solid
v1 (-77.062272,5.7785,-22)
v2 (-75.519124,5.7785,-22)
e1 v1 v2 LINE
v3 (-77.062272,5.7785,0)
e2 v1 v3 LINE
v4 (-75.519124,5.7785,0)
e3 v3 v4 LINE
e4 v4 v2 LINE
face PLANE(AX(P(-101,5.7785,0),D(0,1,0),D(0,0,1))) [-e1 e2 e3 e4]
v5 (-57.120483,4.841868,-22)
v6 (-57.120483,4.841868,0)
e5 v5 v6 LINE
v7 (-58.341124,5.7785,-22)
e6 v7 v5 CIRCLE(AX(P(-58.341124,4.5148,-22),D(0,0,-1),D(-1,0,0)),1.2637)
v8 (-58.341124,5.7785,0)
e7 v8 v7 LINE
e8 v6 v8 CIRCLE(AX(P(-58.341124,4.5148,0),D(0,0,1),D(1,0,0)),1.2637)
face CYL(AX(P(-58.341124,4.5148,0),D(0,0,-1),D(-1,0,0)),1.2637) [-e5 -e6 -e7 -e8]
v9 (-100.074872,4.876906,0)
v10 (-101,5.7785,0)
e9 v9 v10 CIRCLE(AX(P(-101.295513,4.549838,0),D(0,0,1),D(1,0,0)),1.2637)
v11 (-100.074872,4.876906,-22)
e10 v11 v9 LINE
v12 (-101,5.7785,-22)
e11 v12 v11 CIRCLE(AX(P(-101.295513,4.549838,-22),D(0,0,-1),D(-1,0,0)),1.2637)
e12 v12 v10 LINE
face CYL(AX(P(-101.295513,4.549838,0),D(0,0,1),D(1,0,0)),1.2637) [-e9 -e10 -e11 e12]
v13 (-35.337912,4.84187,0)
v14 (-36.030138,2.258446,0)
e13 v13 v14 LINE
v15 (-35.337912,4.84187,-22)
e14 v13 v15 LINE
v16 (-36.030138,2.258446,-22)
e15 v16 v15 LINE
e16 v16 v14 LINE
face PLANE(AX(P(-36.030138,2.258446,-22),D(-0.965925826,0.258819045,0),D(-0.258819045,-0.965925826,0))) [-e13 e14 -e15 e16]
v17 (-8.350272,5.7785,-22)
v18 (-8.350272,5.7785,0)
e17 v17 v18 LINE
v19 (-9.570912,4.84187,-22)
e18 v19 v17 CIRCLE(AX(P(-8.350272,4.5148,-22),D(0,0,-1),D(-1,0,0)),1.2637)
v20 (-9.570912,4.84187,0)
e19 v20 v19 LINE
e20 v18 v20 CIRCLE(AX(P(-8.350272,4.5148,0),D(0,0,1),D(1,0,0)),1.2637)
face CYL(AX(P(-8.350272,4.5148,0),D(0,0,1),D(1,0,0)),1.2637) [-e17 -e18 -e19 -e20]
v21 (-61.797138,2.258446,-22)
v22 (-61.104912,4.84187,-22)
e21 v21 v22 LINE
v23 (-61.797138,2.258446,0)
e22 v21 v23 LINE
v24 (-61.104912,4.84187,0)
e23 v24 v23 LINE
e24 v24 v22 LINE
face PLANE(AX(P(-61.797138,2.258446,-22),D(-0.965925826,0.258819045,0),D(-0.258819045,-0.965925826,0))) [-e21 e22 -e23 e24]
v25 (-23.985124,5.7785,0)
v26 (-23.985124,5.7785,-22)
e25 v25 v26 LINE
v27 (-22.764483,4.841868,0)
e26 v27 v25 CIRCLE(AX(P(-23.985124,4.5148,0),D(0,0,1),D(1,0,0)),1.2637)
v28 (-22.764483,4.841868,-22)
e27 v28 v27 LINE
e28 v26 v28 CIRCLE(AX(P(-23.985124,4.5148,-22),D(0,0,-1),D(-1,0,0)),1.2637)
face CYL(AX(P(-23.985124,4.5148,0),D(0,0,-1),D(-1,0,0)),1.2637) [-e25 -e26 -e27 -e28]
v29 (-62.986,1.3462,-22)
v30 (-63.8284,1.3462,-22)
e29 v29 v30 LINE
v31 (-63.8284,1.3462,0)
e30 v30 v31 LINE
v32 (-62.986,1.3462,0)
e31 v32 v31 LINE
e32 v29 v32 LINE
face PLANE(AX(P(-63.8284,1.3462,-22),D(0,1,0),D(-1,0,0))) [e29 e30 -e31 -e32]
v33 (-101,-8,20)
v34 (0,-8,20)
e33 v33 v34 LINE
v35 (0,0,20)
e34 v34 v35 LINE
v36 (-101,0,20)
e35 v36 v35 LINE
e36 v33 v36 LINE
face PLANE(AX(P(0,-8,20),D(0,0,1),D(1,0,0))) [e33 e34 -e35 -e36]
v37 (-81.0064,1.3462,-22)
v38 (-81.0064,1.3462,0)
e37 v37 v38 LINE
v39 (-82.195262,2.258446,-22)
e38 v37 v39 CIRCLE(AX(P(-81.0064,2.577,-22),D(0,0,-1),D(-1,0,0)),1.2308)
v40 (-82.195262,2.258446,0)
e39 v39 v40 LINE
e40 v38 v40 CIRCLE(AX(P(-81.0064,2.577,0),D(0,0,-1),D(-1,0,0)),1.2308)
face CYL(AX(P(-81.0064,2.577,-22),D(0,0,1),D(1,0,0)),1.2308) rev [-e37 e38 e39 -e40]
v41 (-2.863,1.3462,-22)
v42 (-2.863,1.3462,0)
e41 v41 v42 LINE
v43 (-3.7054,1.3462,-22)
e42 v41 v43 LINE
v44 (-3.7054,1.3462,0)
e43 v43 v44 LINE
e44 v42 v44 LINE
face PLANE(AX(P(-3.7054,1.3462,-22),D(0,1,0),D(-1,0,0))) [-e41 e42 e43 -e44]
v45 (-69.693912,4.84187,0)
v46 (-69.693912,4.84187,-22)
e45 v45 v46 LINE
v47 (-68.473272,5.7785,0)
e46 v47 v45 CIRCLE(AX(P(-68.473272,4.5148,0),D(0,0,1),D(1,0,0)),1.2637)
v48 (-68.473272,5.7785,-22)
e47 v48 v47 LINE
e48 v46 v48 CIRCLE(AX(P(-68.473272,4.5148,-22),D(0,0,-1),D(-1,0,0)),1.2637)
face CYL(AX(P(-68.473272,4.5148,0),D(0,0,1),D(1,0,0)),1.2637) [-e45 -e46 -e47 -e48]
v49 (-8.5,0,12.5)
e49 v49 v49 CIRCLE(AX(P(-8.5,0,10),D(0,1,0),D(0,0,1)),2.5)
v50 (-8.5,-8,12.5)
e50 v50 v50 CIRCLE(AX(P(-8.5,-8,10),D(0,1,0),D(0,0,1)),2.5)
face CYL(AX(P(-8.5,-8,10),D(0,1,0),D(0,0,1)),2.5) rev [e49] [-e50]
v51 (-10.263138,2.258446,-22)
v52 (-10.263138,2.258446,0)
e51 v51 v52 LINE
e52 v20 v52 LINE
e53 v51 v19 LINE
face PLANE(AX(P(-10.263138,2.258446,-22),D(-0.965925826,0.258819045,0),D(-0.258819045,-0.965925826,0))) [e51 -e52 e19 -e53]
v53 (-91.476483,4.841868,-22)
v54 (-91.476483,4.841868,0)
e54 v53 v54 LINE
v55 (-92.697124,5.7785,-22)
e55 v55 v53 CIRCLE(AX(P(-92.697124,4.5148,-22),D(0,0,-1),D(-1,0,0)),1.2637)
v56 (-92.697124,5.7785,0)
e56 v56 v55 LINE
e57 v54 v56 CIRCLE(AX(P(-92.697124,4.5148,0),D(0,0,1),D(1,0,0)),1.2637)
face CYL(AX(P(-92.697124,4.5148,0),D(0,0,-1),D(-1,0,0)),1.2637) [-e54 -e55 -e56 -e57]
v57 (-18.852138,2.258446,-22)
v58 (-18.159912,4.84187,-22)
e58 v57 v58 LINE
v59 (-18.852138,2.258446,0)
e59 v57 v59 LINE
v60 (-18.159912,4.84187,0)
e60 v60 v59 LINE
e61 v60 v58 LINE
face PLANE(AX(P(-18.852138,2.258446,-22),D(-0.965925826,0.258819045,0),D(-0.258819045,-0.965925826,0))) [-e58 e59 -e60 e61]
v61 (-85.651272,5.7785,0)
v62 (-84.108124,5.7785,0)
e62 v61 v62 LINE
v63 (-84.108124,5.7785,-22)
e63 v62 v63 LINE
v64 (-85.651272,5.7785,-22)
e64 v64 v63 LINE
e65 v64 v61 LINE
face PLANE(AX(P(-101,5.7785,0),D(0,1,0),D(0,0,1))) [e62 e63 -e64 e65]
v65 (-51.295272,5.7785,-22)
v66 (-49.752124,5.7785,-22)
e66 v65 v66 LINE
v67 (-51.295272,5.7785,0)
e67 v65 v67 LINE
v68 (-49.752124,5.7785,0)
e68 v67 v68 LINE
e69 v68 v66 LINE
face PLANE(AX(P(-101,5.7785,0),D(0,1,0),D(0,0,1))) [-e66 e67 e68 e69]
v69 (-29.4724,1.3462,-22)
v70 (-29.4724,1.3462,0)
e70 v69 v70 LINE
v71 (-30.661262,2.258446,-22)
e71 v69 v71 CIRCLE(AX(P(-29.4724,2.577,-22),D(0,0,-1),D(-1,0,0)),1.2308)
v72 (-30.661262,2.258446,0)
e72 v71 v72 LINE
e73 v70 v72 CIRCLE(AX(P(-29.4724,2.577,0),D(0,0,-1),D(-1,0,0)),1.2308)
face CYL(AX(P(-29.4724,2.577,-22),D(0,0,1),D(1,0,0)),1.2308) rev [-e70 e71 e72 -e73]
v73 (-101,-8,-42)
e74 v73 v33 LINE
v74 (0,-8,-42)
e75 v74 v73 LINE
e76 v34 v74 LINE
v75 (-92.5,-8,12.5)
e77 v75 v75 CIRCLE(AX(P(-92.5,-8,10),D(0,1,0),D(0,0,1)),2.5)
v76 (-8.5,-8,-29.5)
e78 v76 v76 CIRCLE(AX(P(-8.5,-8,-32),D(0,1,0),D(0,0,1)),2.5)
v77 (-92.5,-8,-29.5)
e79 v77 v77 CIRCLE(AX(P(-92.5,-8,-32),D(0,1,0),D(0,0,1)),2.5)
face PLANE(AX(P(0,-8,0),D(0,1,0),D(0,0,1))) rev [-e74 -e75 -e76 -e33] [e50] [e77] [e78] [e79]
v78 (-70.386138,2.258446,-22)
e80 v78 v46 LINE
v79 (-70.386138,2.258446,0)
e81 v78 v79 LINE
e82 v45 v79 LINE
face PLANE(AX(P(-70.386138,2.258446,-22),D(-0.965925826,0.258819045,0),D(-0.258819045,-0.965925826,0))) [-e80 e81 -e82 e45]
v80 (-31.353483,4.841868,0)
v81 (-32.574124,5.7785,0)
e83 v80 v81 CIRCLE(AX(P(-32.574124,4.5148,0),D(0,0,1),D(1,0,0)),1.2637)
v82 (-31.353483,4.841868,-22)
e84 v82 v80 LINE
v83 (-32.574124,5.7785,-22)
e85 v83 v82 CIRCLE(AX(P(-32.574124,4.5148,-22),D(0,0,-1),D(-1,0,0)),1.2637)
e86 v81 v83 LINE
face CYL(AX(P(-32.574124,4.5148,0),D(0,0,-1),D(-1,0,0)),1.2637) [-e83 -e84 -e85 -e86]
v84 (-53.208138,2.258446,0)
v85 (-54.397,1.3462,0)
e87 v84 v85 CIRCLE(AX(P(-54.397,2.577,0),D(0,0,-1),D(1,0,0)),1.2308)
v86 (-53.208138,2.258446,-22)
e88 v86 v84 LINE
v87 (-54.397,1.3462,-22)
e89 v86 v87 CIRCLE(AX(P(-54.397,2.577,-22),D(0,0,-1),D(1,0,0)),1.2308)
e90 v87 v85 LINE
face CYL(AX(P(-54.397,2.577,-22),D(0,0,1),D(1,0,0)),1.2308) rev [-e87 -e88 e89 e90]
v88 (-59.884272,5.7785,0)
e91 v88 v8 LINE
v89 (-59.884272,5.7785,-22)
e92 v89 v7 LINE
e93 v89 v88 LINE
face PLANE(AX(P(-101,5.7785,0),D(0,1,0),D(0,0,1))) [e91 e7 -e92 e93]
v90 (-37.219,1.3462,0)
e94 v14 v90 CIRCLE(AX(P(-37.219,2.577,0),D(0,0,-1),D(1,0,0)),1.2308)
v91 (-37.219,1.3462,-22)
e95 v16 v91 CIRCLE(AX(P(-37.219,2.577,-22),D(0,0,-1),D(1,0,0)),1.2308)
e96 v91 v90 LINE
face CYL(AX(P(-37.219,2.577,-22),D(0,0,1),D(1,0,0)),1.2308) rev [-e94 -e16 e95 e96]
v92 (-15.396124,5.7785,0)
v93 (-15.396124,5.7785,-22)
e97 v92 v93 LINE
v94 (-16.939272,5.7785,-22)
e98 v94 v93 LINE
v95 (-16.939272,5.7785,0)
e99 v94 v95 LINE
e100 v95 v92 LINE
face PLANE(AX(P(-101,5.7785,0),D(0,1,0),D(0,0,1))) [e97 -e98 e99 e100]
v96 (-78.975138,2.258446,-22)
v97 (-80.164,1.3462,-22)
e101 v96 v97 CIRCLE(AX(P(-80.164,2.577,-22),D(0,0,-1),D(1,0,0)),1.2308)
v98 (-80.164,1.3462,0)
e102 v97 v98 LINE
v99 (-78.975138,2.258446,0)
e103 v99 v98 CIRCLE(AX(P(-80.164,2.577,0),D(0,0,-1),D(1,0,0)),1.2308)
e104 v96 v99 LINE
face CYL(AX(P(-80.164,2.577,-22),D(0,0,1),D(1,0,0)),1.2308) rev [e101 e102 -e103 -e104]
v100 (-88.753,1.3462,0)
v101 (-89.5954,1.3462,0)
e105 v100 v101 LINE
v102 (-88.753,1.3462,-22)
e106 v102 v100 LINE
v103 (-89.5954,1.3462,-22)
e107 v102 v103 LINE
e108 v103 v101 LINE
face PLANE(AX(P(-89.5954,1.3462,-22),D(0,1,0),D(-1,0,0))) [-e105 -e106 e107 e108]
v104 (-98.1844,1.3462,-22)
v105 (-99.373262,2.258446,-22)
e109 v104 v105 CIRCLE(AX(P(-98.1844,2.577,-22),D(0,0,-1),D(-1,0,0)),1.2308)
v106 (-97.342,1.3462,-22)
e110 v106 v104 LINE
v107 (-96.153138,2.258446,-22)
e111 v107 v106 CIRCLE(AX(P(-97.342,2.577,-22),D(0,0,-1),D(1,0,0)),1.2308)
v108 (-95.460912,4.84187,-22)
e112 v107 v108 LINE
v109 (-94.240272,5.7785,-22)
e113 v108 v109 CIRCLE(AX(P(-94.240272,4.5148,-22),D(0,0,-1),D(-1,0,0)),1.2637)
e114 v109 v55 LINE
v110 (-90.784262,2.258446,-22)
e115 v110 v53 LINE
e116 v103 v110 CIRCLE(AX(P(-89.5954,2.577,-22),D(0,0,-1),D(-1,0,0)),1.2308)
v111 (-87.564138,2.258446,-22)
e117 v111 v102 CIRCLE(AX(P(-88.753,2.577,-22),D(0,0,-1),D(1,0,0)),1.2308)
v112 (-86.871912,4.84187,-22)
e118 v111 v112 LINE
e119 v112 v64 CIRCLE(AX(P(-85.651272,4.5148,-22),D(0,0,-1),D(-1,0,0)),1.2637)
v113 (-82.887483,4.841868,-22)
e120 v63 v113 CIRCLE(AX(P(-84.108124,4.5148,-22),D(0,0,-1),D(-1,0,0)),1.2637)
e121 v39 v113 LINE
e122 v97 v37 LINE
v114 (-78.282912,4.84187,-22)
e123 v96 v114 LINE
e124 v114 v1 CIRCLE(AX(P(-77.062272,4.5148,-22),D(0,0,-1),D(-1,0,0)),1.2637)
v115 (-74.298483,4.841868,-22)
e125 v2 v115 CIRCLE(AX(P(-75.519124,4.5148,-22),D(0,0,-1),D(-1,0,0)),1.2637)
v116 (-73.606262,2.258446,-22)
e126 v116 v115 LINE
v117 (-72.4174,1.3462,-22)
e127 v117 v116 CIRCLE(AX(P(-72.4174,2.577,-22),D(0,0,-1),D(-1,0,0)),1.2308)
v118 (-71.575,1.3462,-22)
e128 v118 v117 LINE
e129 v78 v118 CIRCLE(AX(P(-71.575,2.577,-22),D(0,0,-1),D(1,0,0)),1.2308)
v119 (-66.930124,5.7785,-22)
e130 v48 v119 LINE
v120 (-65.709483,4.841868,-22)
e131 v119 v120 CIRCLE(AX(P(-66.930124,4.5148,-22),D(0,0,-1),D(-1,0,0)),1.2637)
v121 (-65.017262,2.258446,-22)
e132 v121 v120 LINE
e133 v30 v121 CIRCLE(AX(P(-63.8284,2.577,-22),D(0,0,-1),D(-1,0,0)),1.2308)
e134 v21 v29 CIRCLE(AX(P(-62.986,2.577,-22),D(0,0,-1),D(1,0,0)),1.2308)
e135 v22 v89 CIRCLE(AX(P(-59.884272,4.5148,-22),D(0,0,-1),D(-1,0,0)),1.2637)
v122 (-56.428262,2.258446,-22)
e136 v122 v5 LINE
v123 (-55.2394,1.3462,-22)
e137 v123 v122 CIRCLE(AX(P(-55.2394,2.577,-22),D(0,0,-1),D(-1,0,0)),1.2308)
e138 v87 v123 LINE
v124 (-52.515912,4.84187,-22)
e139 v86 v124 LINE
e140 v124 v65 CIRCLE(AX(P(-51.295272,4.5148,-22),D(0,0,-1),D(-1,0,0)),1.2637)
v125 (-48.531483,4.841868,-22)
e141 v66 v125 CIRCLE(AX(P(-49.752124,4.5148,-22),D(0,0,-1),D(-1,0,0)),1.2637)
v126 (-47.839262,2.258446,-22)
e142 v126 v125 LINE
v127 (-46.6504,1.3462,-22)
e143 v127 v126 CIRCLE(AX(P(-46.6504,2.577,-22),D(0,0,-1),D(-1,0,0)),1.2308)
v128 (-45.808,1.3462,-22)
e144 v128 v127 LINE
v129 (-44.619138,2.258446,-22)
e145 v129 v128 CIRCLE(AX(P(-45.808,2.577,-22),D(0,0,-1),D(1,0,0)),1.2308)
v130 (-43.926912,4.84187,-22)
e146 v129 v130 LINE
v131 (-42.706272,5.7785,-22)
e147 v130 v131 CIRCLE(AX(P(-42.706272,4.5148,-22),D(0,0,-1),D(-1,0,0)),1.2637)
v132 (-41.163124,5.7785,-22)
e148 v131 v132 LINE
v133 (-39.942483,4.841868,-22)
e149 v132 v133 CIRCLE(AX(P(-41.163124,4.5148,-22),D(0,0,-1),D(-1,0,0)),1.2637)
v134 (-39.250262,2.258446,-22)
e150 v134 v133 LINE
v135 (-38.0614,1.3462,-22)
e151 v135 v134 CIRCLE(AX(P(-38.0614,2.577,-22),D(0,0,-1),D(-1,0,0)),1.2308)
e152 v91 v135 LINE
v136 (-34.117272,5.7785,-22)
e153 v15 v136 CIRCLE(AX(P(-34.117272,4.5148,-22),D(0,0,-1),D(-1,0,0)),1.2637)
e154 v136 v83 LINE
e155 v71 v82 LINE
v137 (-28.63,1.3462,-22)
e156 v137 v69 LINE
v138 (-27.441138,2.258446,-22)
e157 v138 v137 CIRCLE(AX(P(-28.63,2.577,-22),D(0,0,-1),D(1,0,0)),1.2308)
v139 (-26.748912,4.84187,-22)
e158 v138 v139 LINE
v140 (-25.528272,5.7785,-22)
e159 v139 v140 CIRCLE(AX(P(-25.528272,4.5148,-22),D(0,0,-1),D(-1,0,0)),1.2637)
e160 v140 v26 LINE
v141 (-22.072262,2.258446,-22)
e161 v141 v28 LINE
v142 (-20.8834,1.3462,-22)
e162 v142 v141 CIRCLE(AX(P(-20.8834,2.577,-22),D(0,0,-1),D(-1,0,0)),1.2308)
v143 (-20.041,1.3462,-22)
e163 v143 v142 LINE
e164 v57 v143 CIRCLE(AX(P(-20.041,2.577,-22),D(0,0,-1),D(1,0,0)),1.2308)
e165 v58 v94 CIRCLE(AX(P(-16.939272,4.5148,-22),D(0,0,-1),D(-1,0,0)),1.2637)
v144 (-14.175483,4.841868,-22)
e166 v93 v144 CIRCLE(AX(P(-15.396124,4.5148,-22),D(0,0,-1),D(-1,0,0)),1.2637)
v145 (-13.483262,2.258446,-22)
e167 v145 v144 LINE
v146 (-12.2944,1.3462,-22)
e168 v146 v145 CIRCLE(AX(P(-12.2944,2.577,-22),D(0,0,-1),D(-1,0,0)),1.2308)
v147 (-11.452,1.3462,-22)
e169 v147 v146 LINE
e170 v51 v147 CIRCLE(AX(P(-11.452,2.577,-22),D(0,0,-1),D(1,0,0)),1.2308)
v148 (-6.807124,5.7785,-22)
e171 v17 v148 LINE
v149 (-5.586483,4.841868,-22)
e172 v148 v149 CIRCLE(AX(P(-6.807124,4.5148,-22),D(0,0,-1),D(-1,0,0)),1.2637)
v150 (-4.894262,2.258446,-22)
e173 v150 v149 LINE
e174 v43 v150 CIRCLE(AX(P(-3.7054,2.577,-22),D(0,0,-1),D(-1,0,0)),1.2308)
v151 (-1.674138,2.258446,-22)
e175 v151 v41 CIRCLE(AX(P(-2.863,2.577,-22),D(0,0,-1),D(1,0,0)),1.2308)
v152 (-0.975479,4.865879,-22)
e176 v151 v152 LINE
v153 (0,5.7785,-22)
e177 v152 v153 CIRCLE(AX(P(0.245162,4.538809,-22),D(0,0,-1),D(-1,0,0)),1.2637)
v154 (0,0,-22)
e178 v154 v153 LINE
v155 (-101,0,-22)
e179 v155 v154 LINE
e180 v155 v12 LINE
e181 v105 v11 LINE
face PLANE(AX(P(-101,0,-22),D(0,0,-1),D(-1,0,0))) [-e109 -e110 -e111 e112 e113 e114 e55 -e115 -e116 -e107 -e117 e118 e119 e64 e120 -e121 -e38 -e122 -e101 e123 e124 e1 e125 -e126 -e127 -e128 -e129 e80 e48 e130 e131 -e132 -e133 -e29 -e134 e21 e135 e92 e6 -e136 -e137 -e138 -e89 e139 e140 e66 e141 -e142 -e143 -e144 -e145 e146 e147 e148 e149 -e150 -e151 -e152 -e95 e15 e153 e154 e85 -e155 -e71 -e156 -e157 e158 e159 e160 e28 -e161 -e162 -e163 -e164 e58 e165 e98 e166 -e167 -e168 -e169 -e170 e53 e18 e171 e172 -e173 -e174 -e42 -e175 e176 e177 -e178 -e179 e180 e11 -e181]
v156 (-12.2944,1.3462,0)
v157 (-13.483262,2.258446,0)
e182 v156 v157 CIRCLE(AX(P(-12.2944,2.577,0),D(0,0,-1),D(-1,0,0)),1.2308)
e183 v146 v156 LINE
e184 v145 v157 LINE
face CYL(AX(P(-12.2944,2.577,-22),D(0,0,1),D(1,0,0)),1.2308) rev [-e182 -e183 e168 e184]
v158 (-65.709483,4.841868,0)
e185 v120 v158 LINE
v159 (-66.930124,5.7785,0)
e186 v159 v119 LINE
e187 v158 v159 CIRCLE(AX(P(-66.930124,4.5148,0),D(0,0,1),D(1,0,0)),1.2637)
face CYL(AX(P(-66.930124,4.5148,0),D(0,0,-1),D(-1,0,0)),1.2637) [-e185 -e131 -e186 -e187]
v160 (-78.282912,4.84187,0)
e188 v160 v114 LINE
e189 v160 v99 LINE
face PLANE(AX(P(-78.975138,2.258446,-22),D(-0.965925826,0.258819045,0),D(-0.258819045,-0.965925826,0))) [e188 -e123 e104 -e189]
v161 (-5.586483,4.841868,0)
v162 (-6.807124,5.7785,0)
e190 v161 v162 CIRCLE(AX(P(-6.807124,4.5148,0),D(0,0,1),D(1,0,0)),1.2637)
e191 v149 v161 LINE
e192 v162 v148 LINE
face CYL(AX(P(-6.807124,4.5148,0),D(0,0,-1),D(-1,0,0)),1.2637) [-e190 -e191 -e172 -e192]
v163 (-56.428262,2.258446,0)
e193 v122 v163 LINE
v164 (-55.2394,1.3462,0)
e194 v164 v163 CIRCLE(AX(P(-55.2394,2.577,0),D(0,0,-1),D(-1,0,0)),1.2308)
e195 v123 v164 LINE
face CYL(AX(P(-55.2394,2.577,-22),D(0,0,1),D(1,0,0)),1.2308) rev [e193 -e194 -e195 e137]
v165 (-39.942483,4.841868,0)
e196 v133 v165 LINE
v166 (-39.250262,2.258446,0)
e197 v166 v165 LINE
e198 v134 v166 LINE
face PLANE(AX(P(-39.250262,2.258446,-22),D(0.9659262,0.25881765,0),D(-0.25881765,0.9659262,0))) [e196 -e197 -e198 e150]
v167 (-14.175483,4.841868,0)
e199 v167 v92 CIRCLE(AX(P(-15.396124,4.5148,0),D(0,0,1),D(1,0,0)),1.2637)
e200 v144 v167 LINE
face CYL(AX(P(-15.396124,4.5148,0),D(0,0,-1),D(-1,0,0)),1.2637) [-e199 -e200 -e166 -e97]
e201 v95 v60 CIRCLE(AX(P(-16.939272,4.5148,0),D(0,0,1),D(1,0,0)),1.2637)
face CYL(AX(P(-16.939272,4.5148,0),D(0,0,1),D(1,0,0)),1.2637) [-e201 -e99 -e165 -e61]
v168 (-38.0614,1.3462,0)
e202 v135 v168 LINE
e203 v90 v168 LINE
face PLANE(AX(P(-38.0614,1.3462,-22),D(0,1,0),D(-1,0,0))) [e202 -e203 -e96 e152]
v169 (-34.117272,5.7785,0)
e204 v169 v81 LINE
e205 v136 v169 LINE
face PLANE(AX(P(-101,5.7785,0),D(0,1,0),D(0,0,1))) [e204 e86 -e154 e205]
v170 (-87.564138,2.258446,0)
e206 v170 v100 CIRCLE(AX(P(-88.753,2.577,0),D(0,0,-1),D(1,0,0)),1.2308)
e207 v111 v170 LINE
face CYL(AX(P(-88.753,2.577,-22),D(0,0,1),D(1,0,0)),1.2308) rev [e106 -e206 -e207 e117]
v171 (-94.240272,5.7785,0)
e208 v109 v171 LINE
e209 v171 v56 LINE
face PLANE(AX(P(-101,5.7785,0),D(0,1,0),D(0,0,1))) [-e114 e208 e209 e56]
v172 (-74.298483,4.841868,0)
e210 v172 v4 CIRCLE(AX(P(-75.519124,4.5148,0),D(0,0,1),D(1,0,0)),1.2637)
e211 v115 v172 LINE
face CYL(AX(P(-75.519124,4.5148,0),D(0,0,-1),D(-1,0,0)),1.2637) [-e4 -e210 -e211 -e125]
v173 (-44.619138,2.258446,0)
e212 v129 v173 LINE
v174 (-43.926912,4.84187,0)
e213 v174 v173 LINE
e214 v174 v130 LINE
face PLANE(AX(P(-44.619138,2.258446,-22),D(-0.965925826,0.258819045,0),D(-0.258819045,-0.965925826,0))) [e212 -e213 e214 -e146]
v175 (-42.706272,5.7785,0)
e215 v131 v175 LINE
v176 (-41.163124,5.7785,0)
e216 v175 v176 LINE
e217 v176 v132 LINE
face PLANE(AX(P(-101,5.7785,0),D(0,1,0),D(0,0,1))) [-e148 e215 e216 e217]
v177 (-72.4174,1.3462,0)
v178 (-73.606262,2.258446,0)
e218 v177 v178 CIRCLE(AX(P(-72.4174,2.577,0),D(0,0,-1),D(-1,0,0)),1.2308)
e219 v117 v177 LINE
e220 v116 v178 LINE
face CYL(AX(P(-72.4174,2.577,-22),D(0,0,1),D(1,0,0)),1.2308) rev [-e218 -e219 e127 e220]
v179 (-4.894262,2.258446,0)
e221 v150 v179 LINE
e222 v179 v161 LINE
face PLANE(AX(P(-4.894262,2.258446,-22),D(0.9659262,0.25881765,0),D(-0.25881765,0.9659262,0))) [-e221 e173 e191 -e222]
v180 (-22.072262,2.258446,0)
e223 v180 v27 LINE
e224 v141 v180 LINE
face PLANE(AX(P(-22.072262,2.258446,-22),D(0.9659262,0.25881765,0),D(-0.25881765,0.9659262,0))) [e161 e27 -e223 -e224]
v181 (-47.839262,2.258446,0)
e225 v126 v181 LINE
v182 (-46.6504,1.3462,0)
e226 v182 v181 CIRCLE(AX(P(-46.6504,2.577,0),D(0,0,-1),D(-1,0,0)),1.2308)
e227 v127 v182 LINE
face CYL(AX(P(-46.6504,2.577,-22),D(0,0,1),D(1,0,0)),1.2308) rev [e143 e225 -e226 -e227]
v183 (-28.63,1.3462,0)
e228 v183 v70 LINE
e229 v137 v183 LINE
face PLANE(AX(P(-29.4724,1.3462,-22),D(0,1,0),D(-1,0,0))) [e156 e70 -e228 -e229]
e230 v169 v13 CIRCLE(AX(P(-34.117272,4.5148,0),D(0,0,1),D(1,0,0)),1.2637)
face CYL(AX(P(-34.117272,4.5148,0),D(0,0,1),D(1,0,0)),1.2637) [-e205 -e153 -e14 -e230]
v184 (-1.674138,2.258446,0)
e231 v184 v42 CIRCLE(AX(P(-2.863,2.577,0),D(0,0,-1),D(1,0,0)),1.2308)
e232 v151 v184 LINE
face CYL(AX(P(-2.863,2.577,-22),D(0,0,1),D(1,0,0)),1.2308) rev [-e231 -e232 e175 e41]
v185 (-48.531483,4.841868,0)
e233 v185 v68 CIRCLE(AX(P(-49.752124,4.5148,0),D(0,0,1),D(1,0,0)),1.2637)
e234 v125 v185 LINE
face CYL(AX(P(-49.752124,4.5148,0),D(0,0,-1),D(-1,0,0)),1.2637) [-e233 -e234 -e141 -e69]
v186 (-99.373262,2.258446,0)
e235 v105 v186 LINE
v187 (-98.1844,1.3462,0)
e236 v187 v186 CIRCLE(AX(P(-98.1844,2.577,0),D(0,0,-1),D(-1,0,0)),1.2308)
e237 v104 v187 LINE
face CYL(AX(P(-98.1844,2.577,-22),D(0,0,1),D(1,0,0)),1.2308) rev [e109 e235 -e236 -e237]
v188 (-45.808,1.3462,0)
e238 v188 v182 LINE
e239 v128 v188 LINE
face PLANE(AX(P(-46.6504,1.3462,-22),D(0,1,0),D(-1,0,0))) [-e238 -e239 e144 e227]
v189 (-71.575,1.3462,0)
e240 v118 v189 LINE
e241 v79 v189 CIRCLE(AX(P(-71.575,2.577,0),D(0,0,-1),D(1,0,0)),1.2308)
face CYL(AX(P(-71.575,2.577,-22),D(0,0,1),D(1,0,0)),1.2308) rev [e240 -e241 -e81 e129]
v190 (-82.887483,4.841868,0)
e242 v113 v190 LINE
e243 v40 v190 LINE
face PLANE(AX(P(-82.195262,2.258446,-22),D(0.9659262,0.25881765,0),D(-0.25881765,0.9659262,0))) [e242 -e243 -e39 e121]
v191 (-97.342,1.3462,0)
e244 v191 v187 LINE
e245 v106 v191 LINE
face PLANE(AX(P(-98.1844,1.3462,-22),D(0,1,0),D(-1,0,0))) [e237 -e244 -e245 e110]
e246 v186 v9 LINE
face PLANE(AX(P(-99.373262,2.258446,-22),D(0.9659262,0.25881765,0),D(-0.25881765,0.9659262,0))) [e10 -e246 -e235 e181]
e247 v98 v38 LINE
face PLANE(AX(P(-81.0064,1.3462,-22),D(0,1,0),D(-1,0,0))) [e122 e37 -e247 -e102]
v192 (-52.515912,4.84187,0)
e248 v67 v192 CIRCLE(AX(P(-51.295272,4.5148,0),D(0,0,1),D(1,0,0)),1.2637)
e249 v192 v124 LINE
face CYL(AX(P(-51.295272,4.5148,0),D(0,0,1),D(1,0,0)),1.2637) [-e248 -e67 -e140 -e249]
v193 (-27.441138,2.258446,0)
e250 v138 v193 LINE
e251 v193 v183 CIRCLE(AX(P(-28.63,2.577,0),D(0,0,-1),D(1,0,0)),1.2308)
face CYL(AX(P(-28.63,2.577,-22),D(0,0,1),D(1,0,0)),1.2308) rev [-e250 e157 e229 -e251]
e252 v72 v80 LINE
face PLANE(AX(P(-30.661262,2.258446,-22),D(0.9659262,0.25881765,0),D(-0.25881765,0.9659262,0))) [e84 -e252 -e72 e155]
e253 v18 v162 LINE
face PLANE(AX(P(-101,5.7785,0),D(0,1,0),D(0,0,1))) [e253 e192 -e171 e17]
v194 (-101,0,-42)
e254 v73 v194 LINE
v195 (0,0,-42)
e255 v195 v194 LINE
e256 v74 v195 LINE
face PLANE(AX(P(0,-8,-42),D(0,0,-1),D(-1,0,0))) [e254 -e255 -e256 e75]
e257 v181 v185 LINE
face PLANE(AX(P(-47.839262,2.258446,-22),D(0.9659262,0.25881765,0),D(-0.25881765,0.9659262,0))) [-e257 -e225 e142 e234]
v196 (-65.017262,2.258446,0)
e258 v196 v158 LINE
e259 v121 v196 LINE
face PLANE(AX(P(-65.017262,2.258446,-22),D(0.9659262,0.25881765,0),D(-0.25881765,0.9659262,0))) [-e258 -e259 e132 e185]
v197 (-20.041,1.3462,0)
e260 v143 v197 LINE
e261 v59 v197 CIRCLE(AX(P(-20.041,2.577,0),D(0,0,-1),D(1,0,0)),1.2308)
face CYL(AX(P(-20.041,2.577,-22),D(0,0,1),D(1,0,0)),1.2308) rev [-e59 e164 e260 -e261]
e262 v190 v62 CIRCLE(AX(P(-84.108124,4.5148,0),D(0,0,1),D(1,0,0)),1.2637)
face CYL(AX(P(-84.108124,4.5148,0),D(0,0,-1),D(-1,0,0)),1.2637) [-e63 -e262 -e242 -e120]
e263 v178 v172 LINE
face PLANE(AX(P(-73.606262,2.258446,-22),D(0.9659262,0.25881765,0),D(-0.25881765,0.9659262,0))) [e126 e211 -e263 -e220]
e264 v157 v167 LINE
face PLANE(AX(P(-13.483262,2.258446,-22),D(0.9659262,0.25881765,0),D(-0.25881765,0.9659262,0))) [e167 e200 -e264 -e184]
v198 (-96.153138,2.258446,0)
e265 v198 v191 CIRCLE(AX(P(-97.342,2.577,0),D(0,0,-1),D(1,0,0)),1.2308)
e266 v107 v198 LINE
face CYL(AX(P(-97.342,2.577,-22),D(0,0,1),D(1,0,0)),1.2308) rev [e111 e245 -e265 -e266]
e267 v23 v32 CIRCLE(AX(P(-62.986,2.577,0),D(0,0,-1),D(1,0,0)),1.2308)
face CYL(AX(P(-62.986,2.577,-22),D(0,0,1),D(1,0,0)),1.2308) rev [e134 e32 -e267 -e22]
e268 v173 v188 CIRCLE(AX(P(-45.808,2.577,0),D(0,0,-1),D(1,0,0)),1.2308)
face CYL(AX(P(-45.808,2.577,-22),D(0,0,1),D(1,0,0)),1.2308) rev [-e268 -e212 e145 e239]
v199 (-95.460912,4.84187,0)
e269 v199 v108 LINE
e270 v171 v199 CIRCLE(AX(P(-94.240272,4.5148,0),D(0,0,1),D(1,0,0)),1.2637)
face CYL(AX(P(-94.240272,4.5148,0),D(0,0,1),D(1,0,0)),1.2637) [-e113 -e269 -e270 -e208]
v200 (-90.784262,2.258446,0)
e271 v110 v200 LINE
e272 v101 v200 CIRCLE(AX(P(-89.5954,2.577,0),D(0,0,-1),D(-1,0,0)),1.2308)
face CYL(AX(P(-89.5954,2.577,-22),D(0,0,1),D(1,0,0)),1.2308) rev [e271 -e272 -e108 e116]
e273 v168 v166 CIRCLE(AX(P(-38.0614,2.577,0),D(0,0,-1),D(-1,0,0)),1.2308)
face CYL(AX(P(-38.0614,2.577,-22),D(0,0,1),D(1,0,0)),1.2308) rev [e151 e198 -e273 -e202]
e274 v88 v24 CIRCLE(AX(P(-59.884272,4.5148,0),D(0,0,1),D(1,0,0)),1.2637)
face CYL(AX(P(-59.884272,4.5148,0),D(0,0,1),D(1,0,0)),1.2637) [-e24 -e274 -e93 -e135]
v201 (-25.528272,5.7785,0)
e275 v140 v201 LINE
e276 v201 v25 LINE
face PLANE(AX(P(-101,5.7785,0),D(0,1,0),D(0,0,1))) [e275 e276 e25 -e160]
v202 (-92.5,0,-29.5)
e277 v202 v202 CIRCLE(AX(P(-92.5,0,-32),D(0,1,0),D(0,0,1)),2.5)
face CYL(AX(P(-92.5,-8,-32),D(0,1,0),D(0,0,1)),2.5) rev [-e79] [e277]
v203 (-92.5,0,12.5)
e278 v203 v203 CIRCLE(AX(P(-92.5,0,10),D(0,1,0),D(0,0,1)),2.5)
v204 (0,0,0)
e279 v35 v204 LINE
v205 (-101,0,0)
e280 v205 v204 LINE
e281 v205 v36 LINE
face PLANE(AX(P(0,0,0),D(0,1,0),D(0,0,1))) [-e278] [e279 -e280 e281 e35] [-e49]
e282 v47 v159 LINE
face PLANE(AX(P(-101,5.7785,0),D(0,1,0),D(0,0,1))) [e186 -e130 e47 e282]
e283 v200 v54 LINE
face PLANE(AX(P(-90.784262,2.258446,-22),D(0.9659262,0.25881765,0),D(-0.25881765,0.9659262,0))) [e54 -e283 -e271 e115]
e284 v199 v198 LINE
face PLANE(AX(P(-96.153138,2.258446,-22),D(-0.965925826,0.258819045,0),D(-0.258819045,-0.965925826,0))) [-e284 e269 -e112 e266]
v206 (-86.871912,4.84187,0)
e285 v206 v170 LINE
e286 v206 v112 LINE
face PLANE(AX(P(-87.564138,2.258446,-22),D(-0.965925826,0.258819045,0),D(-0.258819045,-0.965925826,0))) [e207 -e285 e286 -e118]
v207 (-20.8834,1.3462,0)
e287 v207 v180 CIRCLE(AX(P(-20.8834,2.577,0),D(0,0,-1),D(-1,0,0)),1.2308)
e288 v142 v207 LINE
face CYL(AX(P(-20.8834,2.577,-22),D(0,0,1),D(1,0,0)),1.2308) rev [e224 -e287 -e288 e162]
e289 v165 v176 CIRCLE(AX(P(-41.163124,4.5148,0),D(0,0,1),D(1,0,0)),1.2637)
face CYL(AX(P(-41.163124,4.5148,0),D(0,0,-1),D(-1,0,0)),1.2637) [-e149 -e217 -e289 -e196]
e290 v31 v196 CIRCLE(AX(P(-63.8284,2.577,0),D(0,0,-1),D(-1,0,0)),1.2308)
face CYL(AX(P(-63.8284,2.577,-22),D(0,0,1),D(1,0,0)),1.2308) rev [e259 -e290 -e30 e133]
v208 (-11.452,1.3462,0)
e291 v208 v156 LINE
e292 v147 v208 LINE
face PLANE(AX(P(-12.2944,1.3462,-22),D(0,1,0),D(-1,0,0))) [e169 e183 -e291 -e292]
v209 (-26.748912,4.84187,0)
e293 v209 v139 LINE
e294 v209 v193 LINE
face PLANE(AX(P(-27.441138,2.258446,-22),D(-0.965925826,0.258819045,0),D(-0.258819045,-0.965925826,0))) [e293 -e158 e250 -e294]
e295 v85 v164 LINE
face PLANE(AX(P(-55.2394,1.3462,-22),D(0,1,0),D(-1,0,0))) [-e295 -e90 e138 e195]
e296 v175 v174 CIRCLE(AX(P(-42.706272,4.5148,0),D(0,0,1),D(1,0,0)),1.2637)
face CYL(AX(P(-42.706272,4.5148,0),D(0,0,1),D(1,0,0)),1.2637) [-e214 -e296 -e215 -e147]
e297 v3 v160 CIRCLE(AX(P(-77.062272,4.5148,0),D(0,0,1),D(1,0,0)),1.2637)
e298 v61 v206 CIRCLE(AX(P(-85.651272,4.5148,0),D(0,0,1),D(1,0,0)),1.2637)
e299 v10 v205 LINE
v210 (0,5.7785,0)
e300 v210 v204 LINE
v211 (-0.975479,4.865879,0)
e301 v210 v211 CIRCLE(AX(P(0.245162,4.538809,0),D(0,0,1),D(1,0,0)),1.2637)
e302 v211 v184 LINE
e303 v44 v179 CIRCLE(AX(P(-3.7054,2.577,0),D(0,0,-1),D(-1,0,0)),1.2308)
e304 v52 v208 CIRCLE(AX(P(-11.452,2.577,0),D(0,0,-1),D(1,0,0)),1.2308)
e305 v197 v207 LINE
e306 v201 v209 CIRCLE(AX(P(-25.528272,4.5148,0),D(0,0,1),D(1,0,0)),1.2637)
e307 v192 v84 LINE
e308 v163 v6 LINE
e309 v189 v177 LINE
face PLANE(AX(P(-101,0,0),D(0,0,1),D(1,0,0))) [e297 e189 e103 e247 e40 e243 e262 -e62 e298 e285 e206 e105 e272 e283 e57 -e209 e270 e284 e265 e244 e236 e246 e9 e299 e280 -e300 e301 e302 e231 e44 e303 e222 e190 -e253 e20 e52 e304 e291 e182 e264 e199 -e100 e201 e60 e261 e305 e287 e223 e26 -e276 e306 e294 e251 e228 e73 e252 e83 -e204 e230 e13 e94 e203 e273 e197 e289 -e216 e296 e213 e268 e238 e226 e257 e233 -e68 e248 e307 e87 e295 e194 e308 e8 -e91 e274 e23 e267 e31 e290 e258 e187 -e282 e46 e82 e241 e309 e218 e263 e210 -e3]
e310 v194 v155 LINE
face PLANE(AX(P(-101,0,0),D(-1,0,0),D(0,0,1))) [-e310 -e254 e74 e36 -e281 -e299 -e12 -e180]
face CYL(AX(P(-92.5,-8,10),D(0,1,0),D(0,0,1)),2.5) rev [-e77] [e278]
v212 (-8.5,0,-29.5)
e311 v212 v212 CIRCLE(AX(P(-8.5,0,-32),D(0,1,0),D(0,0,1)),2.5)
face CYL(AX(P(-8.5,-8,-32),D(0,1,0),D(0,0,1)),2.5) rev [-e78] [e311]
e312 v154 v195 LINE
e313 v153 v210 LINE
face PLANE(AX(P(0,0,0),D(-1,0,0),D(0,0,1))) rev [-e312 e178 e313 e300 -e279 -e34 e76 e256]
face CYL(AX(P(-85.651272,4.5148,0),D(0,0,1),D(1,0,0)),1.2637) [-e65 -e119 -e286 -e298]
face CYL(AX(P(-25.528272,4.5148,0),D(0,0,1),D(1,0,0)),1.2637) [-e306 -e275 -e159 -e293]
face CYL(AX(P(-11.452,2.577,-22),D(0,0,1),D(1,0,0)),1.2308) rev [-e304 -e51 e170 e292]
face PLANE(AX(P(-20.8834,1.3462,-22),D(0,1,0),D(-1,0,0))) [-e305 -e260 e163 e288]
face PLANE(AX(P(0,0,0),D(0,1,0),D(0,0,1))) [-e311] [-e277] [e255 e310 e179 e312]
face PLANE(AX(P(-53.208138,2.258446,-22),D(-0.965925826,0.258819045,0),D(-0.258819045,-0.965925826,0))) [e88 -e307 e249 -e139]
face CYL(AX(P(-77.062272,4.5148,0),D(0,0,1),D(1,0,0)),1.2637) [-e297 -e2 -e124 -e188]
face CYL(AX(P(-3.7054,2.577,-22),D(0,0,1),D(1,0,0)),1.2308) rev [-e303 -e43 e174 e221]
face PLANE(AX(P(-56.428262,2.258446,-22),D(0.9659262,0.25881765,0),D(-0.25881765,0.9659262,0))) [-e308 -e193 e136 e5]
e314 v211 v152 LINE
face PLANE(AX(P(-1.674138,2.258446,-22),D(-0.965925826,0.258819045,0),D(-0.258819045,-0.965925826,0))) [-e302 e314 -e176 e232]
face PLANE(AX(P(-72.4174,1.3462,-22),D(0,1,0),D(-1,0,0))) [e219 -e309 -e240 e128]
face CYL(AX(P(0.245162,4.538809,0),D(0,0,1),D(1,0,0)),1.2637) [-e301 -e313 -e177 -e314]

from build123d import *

# Parameters (mm, degrees)
SKETCH3_W           = 22
SKETCH3_H           = 5.7785
BOSS_EXTRUDE2_DEPTH = 101
CUT_EXTRUDE1_DEPTH  = 104.529662717
FILLET1_R           = 1.2637
SKETCH10_W          = 101
SKETCH10_H          = 62
BOSS_EXTRUDE6_DEPTH = 8
SKETCH11_R          = 2.5
CUT_EXTRUDE2_DEPTH  = 110.676797911
SKETCH12_R          = 2.5
CUT_EXTRUDE3_DEPTH  = 110.676797911


with BuildPart() as part:
    # Sketch3 → Boss-Extrude2 (new body)
    with BuildSketch(Plane(origin=(0, 0, 0), x_dir=(0, 0, -1), z_dir=(1, 0, 0))):
        with Locations((11, 2.88925)):
            Rectangle(SKETCH3_W, SKETCH3_H)
    extrude(amount=-BOSS_EXTRUDE2_DEPTH)

    # Sketch5 → Cut-Extrude1 (cut, through all)
    with BuildSketch(Plane(origin=(0, 0, 0), x_dir=(-1, 0, 0), z_dir=(0, 0, -1))):
        with BuildLine():
            Line((1.674138493, 2.258445519), (0.421264214, 6.934235985))
            Line((0.421264214, 6.934235985), (6.147128546, 6.934235985))
            Line((6.147128546, 6.934235985), (4.894261507, 2.258445519))
            ThreePointArc((4.894261507, 2.258445519), (4.454663567, 1.600540709), (3.7054, 1.3462))
            Line((3.7054, 1.3462), (2.863, 1.3462))
            ThreePointArc((2.863, 1.3462), (2.113736433, 1.600540709), (1.674138493, 2.258445519))
        make_face()
        with BuildLine():
            Line((10.263138493, 2.258445519), (9.010264214, 6.934235985))
            Line((9.010264214, 6.934235985), (14.736128546, 6.934235985))
            Line((14.736128546, 6.934235985), (13.483261507, 2.258445519))
            ThreePointArc((13.483261507, 2.258445519), (13.043663567, 1.600540709), (12.2944, 1.3462))
            Line((12.2944, 1.3462), (11.452, 1.3462))
            ThreePointArc((11.452, 1.3462), (10.702736433, 1.600540709), (10.263138493, 2.258445519))
        make_face()
        with BuildLine():
            Line((18.852138493, 2.258445519), (17.599264214, 6.934235985))
            Line((17.599264214, 6.934235985), (23.325128546, 6.934235985))
            Line((23.325128546, 6.934235985), (22.072261507, 2.258445519))
            ThreePointArc((22.072261507, 2.258445519), (21.632663567, 1.600540709), (20.8834, 1.3462))
            Line((20.8834, 1.3462), (20.041, 1.3462))
            ThreePointArc((20.041, 1.3462), (19.291736433, 1.600540709), (18.852138493, 2.258445519))
        make_face()
        with BuildLine():
            Line((27.441138493, 2.258445519), (26.188264214, 6.934235985))
            Line((26.188264214, 6.934235985), (31.914128546, 6.934235985))
            Line((31.914128546, 6.934235985), (30.661261507, 2.258445519))
            ThreePointArc((30.661261507, 2.258445519), (30.221663567, 1.600540709), (29.4724, 1.3462))
            Line((29.4724, 1.3462), (28.63, 1.3462))
            ThreePointArc((28.63, 1.3462), (27.880736433, 1.600540709), (27.441138493, 2.258445519))
        make_face()
        with BuildLine():
            Line((36.030138493, 2.258445519), (34.777264214, 6.934235985))
            Line((34.777264214, 6.934235985), (40.503128546, 6.934235985))
            Line((40.503128546, 6.934235985), (39.250261507, 2.258445519))
            ThreePointArc((39.250261507, 2.258445519), (38.810663567, 1.600540709), (38.0614, 1.3462))
            Line((38.0614, 1.3462), (37.219, 1.3462))
            ThreePointArc((37.219, 1.3462), (36.469736433, 1.600540709), (36.030138493, 2.258445519))
        make_face()
        with BuildLine():
            Line((44.619138493, 2.258445519), (43.366264214, 6.934235985))
            Line((43.366264214, 6.934235985), (49.092128546, 6.934235985))
            Line((49.092128546, 6.934235985), (47.839261507, 2.258445519))
            ThreePointArc((47.839261507, 2.258445519), (47.399663567, 1.600540709), (46.6504, 1.3462))
            Line((46.6504, 1.3462), (45.808, 1.3462))
            ThreePointArc((45.808, 1.3462), (45.058736433, 1.600540709), (44.619138493, 2.258445519))
        make_face()
        with BuildLine():
            Line((53.208138493, 2.258445519), (51.955264214, 6.934235985))
            Line((51.955264214, 6.934235985), (57.681128546, 6.934235985))
            Line((57.681128546, 6.934235985), (56.428261507, 2.258445519))
            ThreePointArc((56.428261507, 2.258445519), (55.988663567, 1.600540709), (55.2394, 1.3462))
            Line((55.2394, 1.3462), (54.397, 1.3462))
            ThreePointArc((54.397, 1.3462), (53.647736433, 1.600540709), (53.208138493, 2.258445519))
        make_face()
        with BuildLine():
            Line((61.797138493, 2.258445519), (60.544264214, 6.934235985))
            Line((60.544264214, 6.934235985), (66.270128546, 6.934235985))
            Line((66.270128546, 6.934235985), (65.017261507, 2.258445519))
            ThreePointArc((65.017261507, 2.258445519), (64.577663567, 1.600540709), (63.8284, 1.3462))
            Line((63.8284, 1.3462), (62.986, 1.3462))
            ThreePointArc((62.986, 1.3462), (62.236736433, 1.600540709), (61.797138493, 2.258445519))
        make_face()
        with BuildLine():
            Line((70.386138493, 2.258445519), (69.133264214, 6.934235985))
            Line((69.133264214, 6.934235985), (74.859128546, 6.934235985))
            Line((74.859128546, 6.934235985), (73.606261507, 2.258445519))
            ThreePointArc((73.606261507, 2.258445519), (73.166663567, 1.600540709), (72.4174, 1.3462))
            Line((72.4174, 1.3462), (71.575, 1.3462))
            ThreePointArc((71.575, 1.3462), (70.825736433, 1.600540709), (70.386138493, 2.258445519))
        make_face()
        with BuildLine():
            Line((78.975138493, 2.258445519), (77.722264214, 6.934235985))
            Line((77.722264214, 6.934235985), (83.448128546, 6.934235985))
            Line((83.448128546, 6.934235985), (82.195261507, 2.258445519))
            ThreePointArc((82.195261507, 2.258445519), (81.755663567, 1.600540709), (81.0064, 1.3462))
            Line((81.0064, 1.3462), (80.164, 1.3462))
            ThreePointArc((80.164, 1.3462), (79.414736433, 1.600540709), (78.975138493, 2.258445519))
        make_face()
        with BuildLine():
            Line((87.564138493, 2.258445519), (86.311264214, 6.934235985))
            Line((86.311264214, 6.934235985), (92.037128546, 6.934235985))
            Line((92.037128546, 6.934235985), (90.784261507, 2.258445519))
            ThreePointArc((90.784261507, 2.258445519), (90.344663567, 1.600540709), (89.5954, 1.3462))
            Line((89.5954, 1.3462), (88.753, 1.3462))
            ThreePointArc((88.753, 1.3462), (88.003736433, 1.600540709), (87.564138493, 2.258445519))
        make_face()
        with BuildLine():
            Line((96.153138493, 2.258445519), (94.900264214, 6.934235985))
            Line((94.900264214, 6.934235985), (100.626128546, 6.934235985))
            Line((100.626128546, 6.934235985), (99.373261507, 2.258445519))
            ThreePointArc((99.373261507, 2.258445519), (98.933663567, 1.600540709), (98.1844, 1.3462))
            Line((98.1844, 1.3462), (97.342, 1.3462))
            ThreePointArc((97.342, 1.3462), (96.592736433, 1.600540709), (96.153138493, 2.258445519))
        make_face()
    extrude(amount=CUT_EXTRUDE1_DEPTH, mode=Mode.SUBTRACT)

    # Fillet1
    # the kernel refuses this fillet: 1.2637 mm, written as the material it takes off along each edge
    with BuildSketch(Plane(origin=(-14.426451812, 5.7785, -24.424181413), x_dir=(-1, 0, 0), z_dir=(0, 0, 1)), Plane(origin=(-23.015451812, 5.7785, -24.424181413), x_dir=(-1, 0, 0), z_dir=(0, 0, 1)), Plane(origin=(-31.604451812, 5.7785, -24.424181413), x_dir=(-1, 0, 0), z_dir=(0, 0, 1)), Plane(origin=(-40.193451812, 5.7785, -24.424181413), x_dir=(-1, 0, 0), z_dir=(0, 0, 1)), Plane(origin=(-48.782451812, 5.7785, -24.424181413), x_dir=(-1, 0, 0), z_dir=(0, 0, 1)), Plane(origin=(-57.371451812, 5.7785, -24.424181413), x_dir=(-1, 0, 0), z_dir=(0, 0, 1)), Plane(origin=(-65.960451812, 5.7785, -24.424181413), x_dir=(-1, 0, 0), z_dir=(0, 0, 1)), Plane(origin=(-74.549451812, 5.7785, -24.424181413), x_dir=(-1, 0, 0), z_dir=(0, 0, 1)), Plane(origin=(-83.138451812, 5.7785, -24.424181413), x_dir=(-1, 0, 0), z_dir=(0, 0, 1)), Plane(origin=(-91.727451812, 5.7785, -24.424181413), x_dir=(-1, 0, 0), z_dir=(0, 0, 1)), Plane(origin=(-5.837451812, 5.7785, -24.424181413), x_dir=(-1, 0, 0), z_dir=(0, 0, 1))) as fillet1_piece_1:
        with BuildLine():
            CenterArc((FILLET1_R * 0.767328135667, FILLET1_R), FILLET1_R, 194.999917223, 75.000082777)
            Line((-FILLET1_R * 0.198598064545, FILLET1_R * 0.7411823504), (-FILLET1_R * 0.217916588549, FILLET1_R * 0.736005997408))
            Line((-FILLET1_R * 0.217916588549, FILLET1_R * 0.736005997408), (-FILLET1_R * 0.0153465627133, -FILLET1_R * 0.02))
            Line((-FILLET1_R * 0.0153465627133, -FILLET1_R * 0.02), (FILLET1_R * 0.767328135667, -FILLET1_R * 0.02))
            Line((FILLET1_R * 0.767328135667, -FILLET1_R * 0.02), (FILLET1_R * 0.767328135667, 0))
        make_face()
    extrude(amount=26.848362825, mode=Mode.SUBTRACT)
    with BuildSketch(Plane(origin=(-9.319942738, 5.7785, 2.424177787), x_dir=(-0.25881904510252474, -0.9659258262890672, 0), z_dir=(0, 0, -1)), Plane(origin=(-17.908942738, 5.7785, 2.424177787), x_dir=(-0.25881904510252474, -0.9659258262890672, 0), z_dir=(0, 0, -1)), Plane(origin=(-26.497942738, 5.7785, 2.424177787), x_dir=(-0.25881904510252496, -0.9659258262890672, 0), z_dir=(0, 0, -1)), Plane(origin=(-35.086942738, 5.7785, 2.424177787), x_dir=(-0.2588190451025256, -0.965925826289067, 0), z_dir=(0, 0, -1)), Plane(origin=(-43.675942738, 5.7785, 2.424177787), x_dir=(-0.2588190451025256, -0.965925826289067, 0), z_dir=(0, 0, -1)), Plane(origin=(-52.264942738, 5.7785, 2.424177787), x_dir=(-0.25881904510252424, -0.9659258262890673, 0), z_dir=(0, 0, -1)), Plane(origin=(-60.853942738, 5.7785, 2.424177787), x_dir=(-0.25881904510252424, -0.9659258262890673, 0), z_dir=(0, 0, -1)), Plane(origin=(-69.442942738, 5.7785, 2.424177787), x_dir=(-0.25881904510252607, -0.9659258262890669, 0), z_dir=(0, 0, -1)), Plane(origin=(-78.031942738, 5.7785, 2.424177787), x_dir=(-0.25881904510252607, -0.9659258262890669, 0), z_dir=(0, 0, -1)), Plane(origin=(-86.620942738, 5.7785, 2.424177787), x_dir=(-0.2588190451025252, -0.9659258262890671, 0), z_dir=(0, 0, -1)), Plane(origin=(-95.209942738, 5.7785, 2.424177787), x_dir=(-0.2588190451025268, -0.9659258262890666, 0), z_dir=(0, 0, -1))) as fillet1_piece_2:
        with BuildLine():
            CenterArc((FILLET1_R * 0.767326987979, -FILLET1_R), FILLET1_R, 90, 75)
            Line((-FILLET1_R * 0.19859883831, -FILLET1_R * 0.741180954897), (-FILLET1_R * 0.217917354836, -FILLET1_R * 0.736004573995))
            Line((-FILLET1_R * 0.217917354836, -FILLET1_R * 0.736004573995), (-FILLET1_R * 0.0153465397596, FILLET1_R * 0.02))
            Line((-FILLET1_R * 0.0153465397596, FILLET1_R * 0.02), (FILLET1_R * 0.767326987979, FILLET1_R * 0.02))
            Line((FILLET1_R * 0.767326987979, FILLET1_R * 0.02), (FILLET1_R * 0.767326987979, 0))
        make_face()
    extrude(amount=26.848355574, mode=Mode.SUBTRACT)
    with BuildSketch(Plane(origin=(-100.316451812, 5.7785, -24.33349599), x_dir=(-1, 0, 0), z_dir=(0, 0, 1))) as fillet1_piece_3:
        with BuildLine():
            CenterArc((0.97906096, 1.22866183), FILLET1_R, 194.999917223, 61.476400821)
            Line((-0.241579979, 0.901593966), (-0.265992798, 0.895052609))
            Line((-0.265992798, 0.895052609), (-0.024412819, -0.006541357))
            Line((-0.024412819, -0.006541357), (0, -0.025274))
            ThreePointArc((0, -0.025274), (0.341774094, -0.025274), (0.677637933, -0.024573237))
            Line((0.677637933, -0.024573237), (0.683548188, 0))
        make_face()
    extrude(amount=26.666991979, mode=Mode.SUBTRACT)
    with BuildSketch(Plane(origin=(-0.730942738, 5.7785, 2.362037613), x_dir=(-0.2588190451025249, -0.9659258262890672, 0), z_dir=(0, 0, -1))) as fillet1_piece_4:
        with BuildLine():
            CenterArc((0.944815045, -1.2637), FILLET1_R, 90, 63.813512011)
            Line((-0.189181901, -0.706036468), (-0.21186184, -0.694883197))
            ThreePointArc((-0.21186184, -0.694883197), (-0.11900376, -0.346476841), (-0.024412809, 0.006541393))
            Line((-0.024412809, 0.006541393), (0, 0.025274))
            Line((0, 0.025274), (0.944815045, 0.025274))
            Line((0.944815045, 0.025274), (0.944815045, 0))
        make_face()
    extrude(amount=26.724075226, mode=Mode.SUBTRACT)

    # Sketch10 → Boss-Extrude6 (add)
    with BuildSketch(Plane(origin=(0, 0, 0), x_dir=(1, 0, 0), z_dir=(0, 1, 0))):
        with Locations((-50.5, 11)):
            Rectangle(SKETCH10_W, SKETCH10_H)
    extrude(amount=-BOSS_EXTRUDE6_DEPTH)

    # Sketch11 → Cut-Extrude2 (cut, through all)
    with BuildSketch(Plane(origin=(0, 0, 0), x_dir=(1, 0, 0), z_dir=(0, 1, 0))):
        with Locations(Location((-8.5, -10, 0), (0, 0, 270))):
            Circle(SKETCH11_R)
        with Locations(Location((-92.5, -10, 0), (0, 0, 270))):
            Circle(SKETCH11_R)
    extrude(amount=-CUT_EXTRUDE2_DEPTH, mode=Mode.SUBTRACT)

    # Sketch12 → Cut-Extrude3 (cut, through all)
    with BuildSketch(Plane(origin=(0, 0, 0), x_dir=(1, 0, 0), z_dir=(0, 1, 0))):
        with Locations(Location((-8.5, 32, 0), (0, 0, 270))):
            Circle(SKETCH12_R)
        with Locations(Location((-92.5, 32, 0), (0, 0, 270))):
            Circle(SKETCH12_R)
    extrude(amount=-CUT_EXTRUDE3_DEPTH, mode=Mode.SUBTRACT)


solid = part.part
